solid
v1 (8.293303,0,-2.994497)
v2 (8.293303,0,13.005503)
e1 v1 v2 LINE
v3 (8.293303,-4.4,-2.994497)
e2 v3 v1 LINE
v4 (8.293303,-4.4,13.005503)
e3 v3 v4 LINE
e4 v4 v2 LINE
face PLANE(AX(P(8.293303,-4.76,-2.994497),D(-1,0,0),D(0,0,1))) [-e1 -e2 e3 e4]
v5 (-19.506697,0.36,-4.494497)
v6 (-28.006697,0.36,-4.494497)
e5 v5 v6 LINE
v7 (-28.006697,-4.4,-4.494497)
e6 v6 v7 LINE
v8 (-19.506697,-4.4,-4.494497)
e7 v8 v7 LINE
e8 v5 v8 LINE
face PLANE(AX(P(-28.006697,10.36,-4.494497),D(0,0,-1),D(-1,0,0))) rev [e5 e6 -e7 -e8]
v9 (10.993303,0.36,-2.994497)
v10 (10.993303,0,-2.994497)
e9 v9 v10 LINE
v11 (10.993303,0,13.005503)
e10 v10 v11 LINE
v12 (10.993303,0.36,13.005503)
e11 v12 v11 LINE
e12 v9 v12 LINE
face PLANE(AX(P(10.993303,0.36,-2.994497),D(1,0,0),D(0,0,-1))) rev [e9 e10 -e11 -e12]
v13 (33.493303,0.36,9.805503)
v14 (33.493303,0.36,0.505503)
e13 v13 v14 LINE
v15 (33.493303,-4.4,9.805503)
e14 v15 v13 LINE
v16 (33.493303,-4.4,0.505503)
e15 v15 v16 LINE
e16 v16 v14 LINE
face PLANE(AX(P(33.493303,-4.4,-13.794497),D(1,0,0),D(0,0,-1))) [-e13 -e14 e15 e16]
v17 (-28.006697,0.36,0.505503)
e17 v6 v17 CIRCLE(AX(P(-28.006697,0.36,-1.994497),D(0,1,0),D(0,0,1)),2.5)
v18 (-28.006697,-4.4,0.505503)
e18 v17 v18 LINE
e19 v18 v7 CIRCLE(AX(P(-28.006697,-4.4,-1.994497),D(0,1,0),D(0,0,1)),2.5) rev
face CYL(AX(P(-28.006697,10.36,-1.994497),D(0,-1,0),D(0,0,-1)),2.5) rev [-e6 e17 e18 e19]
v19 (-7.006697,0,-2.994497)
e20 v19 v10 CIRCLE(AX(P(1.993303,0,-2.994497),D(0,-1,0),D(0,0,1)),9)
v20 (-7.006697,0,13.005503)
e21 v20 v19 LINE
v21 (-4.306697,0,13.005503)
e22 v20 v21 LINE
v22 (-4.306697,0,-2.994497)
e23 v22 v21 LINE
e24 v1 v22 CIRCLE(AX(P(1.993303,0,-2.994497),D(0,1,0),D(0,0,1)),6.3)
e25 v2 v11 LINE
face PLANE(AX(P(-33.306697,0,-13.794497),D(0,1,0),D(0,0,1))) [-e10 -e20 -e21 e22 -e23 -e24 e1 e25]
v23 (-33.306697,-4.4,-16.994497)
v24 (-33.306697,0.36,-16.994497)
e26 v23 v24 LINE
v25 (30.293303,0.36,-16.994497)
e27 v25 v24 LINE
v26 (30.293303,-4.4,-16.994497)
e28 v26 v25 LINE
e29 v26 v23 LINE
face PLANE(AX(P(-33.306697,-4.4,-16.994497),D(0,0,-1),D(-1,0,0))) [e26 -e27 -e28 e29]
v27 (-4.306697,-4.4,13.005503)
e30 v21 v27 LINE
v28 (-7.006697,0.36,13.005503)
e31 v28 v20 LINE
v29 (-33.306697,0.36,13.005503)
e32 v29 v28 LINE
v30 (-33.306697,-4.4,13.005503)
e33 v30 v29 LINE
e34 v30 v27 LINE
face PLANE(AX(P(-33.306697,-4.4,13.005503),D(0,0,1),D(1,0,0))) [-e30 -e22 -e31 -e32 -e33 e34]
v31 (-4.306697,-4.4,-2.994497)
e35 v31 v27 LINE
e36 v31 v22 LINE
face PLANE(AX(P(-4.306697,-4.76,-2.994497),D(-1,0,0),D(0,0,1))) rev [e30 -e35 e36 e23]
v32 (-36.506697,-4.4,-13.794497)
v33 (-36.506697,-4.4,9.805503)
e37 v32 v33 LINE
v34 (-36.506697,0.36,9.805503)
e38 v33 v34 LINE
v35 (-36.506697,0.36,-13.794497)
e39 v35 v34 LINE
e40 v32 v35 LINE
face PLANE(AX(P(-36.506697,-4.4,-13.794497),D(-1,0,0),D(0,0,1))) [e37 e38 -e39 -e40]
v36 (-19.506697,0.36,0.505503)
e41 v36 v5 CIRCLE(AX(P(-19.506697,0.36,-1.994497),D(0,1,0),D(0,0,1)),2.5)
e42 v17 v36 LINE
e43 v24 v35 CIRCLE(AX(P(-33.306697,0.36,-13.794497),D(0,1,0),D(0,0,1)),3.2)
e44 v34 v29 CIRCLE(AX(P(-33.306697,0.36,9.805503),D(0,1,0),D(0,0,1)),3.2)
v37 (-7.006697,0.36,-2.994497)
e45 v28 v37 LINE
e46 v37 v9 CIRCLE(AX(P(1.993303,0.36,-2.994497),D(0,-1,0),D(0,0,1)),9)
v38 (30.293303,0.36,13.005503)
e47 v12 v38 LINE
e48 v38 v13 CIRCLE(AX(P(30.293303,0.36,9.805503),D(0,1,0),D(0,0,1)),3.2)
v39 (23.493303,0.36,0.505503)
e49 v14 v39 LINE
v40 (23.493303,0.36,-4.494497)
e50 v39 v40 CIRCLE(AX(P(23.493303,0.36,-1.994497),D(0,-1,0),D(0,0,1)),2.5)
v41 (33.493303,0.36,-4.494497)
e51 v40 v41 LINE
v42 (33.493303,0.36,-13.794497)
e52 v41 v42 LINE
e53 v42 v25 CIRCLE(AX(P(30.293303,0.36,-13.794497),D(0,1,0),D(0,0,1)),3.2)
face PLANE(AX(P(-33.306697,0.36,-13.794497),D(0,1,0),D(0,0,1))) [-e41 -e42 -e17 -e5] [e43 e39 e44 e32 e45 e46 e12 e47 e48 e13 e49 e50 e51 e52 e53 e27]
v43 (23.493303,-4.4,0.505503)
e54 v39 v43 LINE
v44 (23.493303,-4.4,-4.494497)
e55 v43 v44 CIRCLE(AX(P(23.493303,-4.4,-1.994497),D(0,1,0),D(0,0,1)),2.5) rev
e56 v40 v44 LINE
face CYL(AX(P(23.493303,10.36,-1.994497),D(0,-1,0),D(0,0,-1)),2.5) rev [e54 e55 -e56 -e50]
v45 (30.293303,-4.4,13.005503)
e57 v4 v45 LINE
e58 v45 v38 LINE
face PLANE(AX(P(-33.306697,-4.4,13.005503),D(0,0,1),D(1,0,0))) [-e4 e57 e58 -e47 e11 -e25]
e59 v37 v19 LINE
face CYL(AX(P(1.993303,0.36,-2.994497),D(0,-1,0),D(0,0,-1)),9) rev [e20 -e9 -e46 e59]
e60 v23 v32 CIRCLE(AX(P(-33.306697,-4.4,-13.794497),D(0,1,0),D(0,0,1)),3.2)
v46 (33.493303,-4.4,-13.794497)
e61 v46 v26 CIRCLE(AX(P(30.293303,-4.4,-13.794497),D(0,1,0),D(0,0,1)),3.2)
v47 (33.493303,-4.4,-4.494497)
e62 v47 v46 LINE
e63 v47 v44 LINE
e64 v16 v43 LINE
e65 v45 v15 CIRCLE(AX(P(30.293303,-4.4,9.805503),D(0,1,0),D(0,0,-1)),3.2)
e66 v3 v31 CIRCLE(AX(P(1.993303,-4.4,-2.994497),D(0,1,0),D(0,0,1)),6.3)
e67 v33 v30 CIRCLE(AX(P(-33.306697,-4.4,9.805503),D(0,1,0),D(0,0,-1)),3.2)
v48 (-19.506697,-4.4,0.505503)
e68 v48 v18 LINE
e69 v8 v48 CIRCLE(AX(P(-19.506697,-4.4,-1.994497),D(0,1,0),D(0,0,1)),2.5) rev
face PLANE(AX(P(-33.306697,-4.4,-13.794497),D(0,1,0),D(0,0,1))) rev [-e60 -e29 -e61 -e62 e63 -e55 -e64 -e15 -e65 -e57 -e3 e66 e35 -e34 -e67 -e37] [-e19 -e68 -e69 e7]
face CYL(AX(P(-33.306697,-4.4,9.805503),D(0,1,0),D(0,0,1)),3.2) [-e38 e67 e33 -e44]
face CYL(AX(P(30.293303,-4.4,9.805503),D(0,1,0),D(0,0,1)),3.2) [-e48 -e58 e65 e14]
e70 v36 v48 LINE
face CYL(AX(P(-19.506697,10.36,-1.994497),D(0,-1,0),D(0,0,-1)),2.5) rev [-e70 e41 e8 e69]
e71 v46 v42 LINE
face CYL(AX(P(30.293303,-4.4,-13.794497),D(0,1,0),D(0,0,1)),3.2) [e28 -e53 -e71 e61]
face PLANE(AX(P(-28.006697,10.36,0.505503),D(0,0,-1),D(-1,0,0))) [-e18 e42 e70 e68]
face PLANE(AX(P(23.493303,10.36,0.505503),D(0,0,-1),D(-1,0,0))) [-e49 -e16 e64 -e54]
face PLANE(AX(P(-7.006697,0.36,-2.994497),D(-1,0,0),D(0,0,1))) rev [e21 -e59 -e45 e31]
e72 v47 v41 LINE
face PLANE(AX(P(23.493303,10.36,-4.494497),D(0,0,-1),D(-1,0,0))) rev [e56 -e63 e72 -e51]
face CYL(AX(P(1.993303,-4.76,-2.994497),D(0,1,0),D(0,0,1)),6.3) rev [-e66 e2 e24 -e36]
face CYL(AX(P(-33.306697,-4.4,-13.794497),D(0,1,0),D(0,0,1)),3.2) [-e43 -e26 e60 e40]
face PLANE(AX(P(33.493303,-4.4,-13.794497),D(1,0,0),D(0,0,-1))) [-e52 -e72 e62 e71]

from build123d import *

# Parameters (mm, degrees)
BASE_FLANGE1_DEPTH      = 4.4
CUT_EXTRUDE1_DEPTH      = 10.36
CUT_EXTRUDE1_DEPTH_BACK = 4.76
CUT_EXTRUDE2_DEPTH      = 4.76
BOSS_EXTRUDE1_START     = 0.36
BOSS_EXTRUDE1_DEPTH     = 0.36


# Sheet-metal steps are written as plain solids
with BuildPart() as part:
    # Sketch2 → Base-Flange1 (new body)
    with BuildSketch(Plane(origin=(0, 0, 0), x_dir=(1, 0, 0), z_dir=(0, 1, 0))):
        with BuildLine():
            Line((-33.306696524, 16.994496658), (30.293303476, 16.994496658))
            ThreePointArc((30.293303476, 16.994496658), (32.556045176, 16.057238357), (33.493303476, 13.794496658))
            Line((33.493303476, 13.794496658), (33.493303476, -9.805503342))
            ThreePointArc((33.493303476, -9.805503342), (32.556045176, -12.068245042), (30.293303476, -13.005503342))
            Line((30.293303476, -13.005503342), (-33.306696524, -13.005503342))
            ThreePointArc((-33.306696524, -13.005503342), (-35.569438223, -12.068245042), (-36.506696524, -9.805503342))
            Line((-36.506696524, -9.805503342), (-36.506696524, 13.794496658))
            ThreePointArc((-36.506696524, 13.794496658), (-35.569438223, 16.057238357), (-33.306696524, 16.994496658))
        make_face()
    extrude(amount=-BASE_FLANGE1_DEPTH)

    # Sketch7 → Cut-Extrude1 (cut, two sides: drawn at the far end of the back side and taken through both)
    with BuildSketch(Plane(origin=(0, 0, 0), x_dir=(1, 0, 0), z_dir=(0, 1, 0)).offset(-CUT_EXTRUDE1_DEPTH_BACK)):
        with BuildLine():
            Line((-28.006696524, 4.494496658), (-19.506696524, 4.494496658))
            ThreePointArc((-19.506696524, 4.494496658), (-17.006696524, 1.994496658), (-19.506696524, -0.505503342))
            Line((-19.506696524, -0.505503342), (-28.006696524, -0.505503342))
            ThreePointArc((-28.006696524, -0.505503342), (-30.506696524, 1.994496658), (-28.006696524, 4.494496658))
        make_face()
        with BuildLine():
            Line((23.493303476, 4.494496658), (33.493303476, 4.494496658))
            ThreePointArc((33.493303476, 4.494496658), (35.993303476, 1.994496658), (33.493303476, -0.505503342))
            Line((33.493303476, -0.505503342), (23.493303476, -0.505503342))
            ThreePointArc((23.493303476, -0.505503342), (20.993303476, 1.994496658), (23.493303476, 4.494496658))
        make_face()
    extrude(amount=CUT_EXTRUDE1_DEPTH + CUT_EXTRUDE1_DEPTH_BACK, mode=Mode.SUBTRACT)

    # Sketch8 → Cut-Extrude2 (cut)
    with BuildSketch(Plane(origin=(0, 0, 0), x_dir=(1, 0, 0), z_dir=(0, 1, 0))):
        with BuildLine():
            Line((8.293303476, 2.994496658), (8.293303476, -13.005503342))
            ThreePointArc((8.293303476, -13.005503342), (1.993303476, -19.305503342), (-4.306696524, -13.005503342))
            Line((-4.306696524, -13.005503342), (-4.306696524, 2.994496658))
            ThreePointArc((-4.306696524, 2.994496658), (1.993303476, 9.294496658), (8.293303476, 2.994496658))
        make_face()
    extrude(amount=-CUT_EXTRUDE2_DEPTH, mode=Mode.SUBTRACT)

    # Sketch11 → Boss-Extrude1 (add)
    with BuildSketch(Plane(origin=(0, 0, 0), x_dir=(1, 0, 0), z_dir=(0, 1, 0)).offset(BOSS_EXTRUDE1_START)):
        with BuildLine():
            Line((-36.506696524, 13.794496658), (-36.506696524, -9.805503342))
            ThreePointArc((-36.506696524, -9.805503342), (-35.569438223, -12.068245042), (-33.306696524, -13.005503342))
            Line((-33.306696524, -13.005503342), (-7.006696524, -13.005503342))
            Line((-7.006696524, -13.005503342), (-7.006696524, 2.994496658))
            ThreePointArc((-7.006696524, 2.994496658), (1.993303476, 11.994496658), (10.993303476, 2.994496658))
            Line((10.993303476, 2.994496658), (10.993303476, -13.005503342))
            Line((10.993303476, -13.005503342), (30.293303476, -13.005503342))
            ThreePointArc((30.293303476, -13.005503342), (32.556045176, -12.068245042), (33.493303476, -9.805503342))
            Line((33.493303476, -9.805503342), (33.493303476, -0.505503342))
            Line((33.493303476, -0.505503342), (23.493303476, -0.505503342))
            ThreePointArc((23.493303476, -0.505503342), (20.993303476, 1.994496658), (23.493303476, 4.494496658))
            Line((23.493303476, 4.494496658), (33.493303476, 4.494496658))
            Line((33.493303476, 4.494496658), (33.493303476, 13.794496658))
            ThreePointArc((33.493303476, 13.794496658), (32.556045176, 16.057238357), (30.293303476, 16.994496658))
            Line((30.293303476, 16.994496658), (-33.306696524, 16.994496658))
            ThreePointArc((-33.306696524, 16.994496658), (-35.569438223, 16.057238357), (-36.506696524, 13.794496658))
        make_face()
        with BuildLine():
            Line((-19.506696524, 4.494496658), (-28.006696524, 4.494496658))
            ThreePointArc((-28.006696524, 4.494496658), (-30.506696524, 1.994496658), (-28.006696524, -0.505503342))
            Line((-28.006696524, -0.505503342), (-19.506696524, -0.505503342))
            ThreePointArc((-19.506696524, -0.505503342), (-17.006696524, 1.994496658), (-19.506696524, 4.494496658))
        make_face(mode=Mode.SUBTRACT)
    extrude(amount=-BOSS_EXTRUDE1_DEPTH)


solid = part.part
